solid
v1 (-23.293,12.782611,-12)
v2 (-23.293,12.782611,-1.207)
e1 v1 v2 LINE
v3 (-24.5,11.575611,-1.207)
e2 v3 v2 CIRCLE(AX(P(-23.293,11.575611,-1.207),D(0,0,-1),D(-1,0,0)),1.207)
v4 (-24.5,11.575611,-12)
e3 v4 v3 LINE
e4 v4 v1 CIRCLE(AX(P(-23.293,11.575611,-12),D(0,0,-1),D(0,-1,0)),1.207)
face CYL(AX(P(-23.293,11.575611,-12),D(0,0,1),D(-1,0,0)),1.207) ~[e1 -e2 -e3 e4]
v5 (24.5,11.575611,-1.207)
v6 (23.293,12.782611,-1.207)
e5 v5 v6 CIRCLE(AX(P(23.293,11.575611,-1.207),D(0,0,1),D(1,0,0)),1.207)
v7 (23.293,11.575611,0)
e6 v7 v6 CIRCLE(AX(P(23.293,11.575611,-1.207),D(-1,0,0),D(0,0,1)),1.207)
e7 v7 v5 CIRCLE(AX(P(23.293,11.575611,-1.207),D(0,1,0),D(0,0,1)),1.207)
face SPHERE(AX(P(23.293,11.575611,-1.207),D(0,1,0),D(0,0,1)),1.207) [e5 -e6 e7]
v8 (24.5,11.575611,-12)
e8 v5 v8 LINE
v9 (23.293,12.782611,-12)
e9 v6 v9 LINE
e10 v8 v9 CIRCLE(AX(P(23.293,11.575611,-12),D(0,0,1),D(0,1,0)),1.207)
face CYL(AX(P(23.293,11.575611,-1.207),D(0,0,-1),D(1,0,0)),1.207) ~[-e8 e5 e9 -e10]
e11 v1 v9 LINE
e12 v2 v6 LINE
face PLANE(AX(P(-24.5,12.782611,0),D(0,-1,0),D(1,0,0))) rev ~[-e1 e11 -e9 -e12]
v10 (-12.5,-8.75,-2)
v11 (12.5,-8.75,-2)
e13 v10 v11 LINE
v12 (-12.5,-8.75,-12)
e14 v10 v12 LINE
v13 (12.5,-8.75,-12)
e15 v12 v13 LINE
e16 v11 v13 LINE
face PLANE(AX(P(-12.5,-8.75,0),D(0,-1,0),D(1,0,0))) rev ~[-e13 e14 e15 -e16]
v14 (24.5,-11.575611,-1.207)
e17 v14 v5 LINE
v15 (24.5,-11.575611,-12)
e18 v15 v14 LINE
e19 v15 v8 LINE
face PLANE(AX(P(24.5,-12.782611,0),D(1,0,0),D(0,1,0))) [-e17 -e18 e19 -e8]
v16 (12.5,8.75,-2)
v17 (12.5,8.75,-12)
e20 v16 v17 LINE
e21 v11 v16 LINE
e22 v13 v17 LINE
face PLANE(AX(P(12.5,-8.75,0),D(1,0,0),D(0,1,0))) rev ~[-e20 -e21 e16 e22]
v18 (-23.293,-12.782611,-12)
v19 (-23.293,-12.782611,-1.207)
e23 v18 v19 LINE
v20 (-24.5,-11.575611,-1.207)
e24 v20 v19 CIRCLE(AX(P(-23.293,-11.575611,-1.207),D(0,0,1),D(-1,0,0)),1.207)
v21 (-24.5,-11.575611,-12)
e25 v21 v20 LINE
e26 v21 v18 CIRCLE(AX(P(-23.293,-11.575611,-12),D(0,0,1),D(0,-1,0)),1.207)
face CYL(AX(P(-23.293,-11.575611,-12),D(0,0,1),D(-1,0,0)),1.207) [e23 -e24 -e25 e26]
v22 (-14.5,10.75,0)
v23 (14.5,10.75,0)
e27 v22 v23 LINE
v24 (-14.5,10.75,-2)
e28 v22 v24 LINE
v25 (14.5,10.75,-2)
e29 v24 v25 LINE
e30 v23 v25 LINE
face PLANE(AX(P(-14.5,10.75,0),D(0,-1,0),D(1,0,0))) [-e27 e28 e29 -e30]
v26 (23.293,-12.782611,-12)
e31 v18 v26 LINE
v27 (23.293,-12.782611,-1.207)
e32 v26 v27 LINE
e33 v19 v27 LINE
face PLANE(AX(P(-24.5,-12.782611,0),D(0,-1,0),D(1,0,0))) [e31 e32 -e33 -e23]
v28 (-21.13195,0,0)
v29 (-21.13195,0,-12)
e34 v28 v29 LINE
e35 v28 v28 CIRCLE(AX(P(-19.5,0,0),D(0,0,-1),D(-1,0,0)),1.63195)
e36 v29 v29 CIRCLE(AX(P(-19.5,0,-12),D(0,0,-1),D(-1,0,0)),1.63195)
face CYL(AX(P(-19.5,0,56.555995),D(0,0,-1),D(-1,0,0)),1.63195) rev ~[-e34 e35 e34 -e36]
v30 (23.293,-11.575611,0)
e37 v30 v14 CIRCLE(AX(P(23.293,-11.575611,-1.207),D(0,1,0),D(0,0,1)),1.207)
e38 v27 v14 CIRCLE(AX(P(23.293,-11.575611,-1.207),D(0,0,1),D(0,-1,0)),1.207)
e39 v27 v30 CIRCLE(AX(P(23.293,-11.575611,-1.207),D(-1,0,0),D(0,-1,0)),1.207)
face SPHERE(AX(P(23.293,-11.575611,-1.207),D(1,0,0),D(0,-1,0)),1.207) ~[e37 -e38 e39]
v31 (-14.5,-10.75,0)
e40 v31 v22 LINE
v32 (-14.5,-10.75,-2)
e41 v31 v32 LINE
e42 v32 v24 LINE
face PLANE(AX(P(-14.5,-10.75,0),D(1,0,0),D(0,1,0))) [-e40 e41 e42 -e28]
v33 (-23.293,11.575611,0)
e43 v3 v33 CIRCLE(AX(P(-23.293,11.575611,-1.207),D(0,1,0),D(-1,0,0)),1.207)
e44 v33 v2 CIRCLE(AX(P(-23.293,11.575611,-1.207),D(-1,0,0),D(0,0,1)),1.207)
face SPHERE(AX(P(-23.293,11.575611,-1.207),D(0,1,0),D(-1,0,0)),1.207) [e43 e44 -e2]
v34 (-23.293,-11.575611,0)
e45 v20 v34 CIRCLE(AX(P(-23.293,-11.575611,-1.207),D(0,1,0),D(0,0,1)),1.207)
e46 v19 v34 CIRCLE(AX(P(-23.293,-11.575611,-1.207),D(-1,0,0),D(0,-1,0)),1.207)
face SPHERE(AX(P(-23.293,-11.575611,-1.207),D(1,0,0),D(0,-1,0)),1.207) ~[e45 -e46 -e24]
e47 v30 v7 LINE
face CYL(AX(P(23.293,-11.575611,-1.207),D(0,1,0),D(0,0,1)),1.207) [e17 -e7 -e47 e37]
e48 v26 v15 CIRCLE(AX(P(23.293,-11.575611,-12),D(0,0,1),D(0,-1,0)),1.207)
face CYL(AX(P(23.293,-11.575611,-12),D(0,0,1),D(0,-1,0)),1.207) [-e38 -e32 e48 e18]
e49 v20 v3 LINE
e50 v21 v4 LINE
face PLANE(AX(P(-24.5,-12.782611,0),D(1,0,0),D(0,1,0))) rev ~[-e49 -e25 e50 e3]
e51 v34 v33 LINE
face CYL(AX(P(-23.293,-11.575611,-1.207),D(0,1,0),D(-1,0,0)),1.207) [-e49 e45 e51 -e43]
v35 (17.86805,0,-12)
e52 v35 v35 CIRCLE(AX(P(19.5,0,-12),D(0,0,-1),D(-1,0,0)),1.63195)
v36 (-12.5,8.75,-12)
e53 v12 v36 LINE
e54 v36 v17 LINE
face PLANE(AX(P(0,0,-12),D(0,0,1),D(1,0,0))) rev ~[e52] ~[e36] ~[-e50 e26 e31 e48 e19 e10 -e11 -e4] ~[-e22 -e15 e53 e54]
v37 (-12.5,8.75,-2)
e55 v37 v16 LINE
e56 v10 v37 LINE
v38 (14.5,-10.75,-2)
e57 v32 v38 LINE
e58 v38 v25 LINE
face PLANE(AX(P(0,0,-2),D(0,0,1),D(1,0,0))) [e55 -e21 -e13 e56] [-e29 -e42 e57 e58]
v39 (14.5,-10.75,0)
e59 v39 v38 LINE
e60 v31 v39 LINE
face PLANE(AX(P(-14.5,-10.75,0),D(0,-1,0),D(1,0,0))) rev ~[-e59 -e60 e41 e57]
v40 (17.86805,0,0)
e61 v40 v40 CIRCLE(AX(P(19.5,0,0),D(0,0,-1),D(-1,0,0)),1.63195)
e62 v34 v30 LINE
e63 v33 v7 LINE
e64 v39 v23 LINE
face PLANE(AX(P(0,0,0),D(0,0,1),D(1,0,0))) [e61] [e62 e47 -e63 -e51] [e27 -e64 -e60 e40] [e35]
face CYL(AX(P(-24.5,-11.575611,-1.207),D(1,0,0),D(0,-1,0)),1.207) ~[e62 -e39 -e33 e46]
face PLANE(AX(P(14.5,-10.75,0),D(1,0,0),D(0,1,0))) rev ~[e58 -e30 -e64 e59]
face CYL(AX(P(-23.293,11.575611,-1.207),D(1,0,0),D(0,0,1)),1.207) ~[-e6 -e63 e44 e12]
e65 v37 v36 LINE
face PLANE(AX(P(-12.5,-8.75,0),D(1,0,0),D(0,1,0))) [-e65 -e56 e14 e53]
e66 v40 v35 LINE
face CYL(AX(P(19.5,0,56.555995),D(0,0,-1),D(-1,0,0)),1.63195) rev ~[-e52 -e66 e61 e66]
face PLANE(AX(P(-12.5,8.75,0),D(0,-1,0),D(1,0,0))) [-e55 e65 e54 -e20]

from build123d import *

# Parameters (mm, degrees)
F0_W     = 49
F0_H     = 25.5652221807
F1_DEPTH = 12
F2_W     = 29
F2_H     = 21.5
F3_DEPTH = 2
F4_W     = 25
F4_H     = 17.5
F5_DEPTH = 12
F7_D     = 3.2639
F8_R     = 1.207
F9_R     = 1.207
F10_R    = 1.207
F11_R    = 1.207


# Not quite as in the source:
# - a feature names something its author has since deleted; it is built from what else it names


with BuildPart() as f1:
    # F0 (on Top) → F1 (new body)
    with BuildSketch(Plane.XY):
        Rectangle(F0_W, F0_H)
    extrude(amount=-F1_DEPTH)

    # F2 (on face) → F3 (cut)
    with BuildSketch(Plane.XY):
        Rectangle(F2_W, F2_H)
    extrude(amount=-F3_DEPTH, mode=Mode.SUBTRACT)

    # F4 (on Top) → F5 (cut)
    with BuildSketch(Plane.XY):
        Rectangle(F4_W, F4_H)
    extrude(amount=-F5_DEPTH, mode=Mode.SUBTRACT)

    # F7 (through all)
    with Locations(Plane.XY):
        with Locations((-19.5, 0), (19.5, 0)):
            Hole(F7_D / 2)

    # F8
    f8_edges = [f1.edges().sort_by_distance(p)[0] for p in [
        (0, -12.782611, 0),
    ]]
    fillet(f8_edges, radius=F8_R)

    # F9
    f9_edges = [f1.edges().sort_by_distance(p)[0] for p in [
        (24.5, 0.6035, 0),
    ]]
    fillet(f9_edges, radius=F9_R)

    # F10
    f10_edges = [f1.edges().sort_by_distance(p)[0] for p in [
        (-24.5, 0.6035, 0),
    ]]
    fillet(f10_edges, radius=F10_R)

    # F11
    f11_edges = [f1.edges().sort_by_distance(p)[0] for p in [
        (0, 12.782611, 0),
    ]]
    fillet(f11_edges, radius=F11_R)


solid = f1.part
